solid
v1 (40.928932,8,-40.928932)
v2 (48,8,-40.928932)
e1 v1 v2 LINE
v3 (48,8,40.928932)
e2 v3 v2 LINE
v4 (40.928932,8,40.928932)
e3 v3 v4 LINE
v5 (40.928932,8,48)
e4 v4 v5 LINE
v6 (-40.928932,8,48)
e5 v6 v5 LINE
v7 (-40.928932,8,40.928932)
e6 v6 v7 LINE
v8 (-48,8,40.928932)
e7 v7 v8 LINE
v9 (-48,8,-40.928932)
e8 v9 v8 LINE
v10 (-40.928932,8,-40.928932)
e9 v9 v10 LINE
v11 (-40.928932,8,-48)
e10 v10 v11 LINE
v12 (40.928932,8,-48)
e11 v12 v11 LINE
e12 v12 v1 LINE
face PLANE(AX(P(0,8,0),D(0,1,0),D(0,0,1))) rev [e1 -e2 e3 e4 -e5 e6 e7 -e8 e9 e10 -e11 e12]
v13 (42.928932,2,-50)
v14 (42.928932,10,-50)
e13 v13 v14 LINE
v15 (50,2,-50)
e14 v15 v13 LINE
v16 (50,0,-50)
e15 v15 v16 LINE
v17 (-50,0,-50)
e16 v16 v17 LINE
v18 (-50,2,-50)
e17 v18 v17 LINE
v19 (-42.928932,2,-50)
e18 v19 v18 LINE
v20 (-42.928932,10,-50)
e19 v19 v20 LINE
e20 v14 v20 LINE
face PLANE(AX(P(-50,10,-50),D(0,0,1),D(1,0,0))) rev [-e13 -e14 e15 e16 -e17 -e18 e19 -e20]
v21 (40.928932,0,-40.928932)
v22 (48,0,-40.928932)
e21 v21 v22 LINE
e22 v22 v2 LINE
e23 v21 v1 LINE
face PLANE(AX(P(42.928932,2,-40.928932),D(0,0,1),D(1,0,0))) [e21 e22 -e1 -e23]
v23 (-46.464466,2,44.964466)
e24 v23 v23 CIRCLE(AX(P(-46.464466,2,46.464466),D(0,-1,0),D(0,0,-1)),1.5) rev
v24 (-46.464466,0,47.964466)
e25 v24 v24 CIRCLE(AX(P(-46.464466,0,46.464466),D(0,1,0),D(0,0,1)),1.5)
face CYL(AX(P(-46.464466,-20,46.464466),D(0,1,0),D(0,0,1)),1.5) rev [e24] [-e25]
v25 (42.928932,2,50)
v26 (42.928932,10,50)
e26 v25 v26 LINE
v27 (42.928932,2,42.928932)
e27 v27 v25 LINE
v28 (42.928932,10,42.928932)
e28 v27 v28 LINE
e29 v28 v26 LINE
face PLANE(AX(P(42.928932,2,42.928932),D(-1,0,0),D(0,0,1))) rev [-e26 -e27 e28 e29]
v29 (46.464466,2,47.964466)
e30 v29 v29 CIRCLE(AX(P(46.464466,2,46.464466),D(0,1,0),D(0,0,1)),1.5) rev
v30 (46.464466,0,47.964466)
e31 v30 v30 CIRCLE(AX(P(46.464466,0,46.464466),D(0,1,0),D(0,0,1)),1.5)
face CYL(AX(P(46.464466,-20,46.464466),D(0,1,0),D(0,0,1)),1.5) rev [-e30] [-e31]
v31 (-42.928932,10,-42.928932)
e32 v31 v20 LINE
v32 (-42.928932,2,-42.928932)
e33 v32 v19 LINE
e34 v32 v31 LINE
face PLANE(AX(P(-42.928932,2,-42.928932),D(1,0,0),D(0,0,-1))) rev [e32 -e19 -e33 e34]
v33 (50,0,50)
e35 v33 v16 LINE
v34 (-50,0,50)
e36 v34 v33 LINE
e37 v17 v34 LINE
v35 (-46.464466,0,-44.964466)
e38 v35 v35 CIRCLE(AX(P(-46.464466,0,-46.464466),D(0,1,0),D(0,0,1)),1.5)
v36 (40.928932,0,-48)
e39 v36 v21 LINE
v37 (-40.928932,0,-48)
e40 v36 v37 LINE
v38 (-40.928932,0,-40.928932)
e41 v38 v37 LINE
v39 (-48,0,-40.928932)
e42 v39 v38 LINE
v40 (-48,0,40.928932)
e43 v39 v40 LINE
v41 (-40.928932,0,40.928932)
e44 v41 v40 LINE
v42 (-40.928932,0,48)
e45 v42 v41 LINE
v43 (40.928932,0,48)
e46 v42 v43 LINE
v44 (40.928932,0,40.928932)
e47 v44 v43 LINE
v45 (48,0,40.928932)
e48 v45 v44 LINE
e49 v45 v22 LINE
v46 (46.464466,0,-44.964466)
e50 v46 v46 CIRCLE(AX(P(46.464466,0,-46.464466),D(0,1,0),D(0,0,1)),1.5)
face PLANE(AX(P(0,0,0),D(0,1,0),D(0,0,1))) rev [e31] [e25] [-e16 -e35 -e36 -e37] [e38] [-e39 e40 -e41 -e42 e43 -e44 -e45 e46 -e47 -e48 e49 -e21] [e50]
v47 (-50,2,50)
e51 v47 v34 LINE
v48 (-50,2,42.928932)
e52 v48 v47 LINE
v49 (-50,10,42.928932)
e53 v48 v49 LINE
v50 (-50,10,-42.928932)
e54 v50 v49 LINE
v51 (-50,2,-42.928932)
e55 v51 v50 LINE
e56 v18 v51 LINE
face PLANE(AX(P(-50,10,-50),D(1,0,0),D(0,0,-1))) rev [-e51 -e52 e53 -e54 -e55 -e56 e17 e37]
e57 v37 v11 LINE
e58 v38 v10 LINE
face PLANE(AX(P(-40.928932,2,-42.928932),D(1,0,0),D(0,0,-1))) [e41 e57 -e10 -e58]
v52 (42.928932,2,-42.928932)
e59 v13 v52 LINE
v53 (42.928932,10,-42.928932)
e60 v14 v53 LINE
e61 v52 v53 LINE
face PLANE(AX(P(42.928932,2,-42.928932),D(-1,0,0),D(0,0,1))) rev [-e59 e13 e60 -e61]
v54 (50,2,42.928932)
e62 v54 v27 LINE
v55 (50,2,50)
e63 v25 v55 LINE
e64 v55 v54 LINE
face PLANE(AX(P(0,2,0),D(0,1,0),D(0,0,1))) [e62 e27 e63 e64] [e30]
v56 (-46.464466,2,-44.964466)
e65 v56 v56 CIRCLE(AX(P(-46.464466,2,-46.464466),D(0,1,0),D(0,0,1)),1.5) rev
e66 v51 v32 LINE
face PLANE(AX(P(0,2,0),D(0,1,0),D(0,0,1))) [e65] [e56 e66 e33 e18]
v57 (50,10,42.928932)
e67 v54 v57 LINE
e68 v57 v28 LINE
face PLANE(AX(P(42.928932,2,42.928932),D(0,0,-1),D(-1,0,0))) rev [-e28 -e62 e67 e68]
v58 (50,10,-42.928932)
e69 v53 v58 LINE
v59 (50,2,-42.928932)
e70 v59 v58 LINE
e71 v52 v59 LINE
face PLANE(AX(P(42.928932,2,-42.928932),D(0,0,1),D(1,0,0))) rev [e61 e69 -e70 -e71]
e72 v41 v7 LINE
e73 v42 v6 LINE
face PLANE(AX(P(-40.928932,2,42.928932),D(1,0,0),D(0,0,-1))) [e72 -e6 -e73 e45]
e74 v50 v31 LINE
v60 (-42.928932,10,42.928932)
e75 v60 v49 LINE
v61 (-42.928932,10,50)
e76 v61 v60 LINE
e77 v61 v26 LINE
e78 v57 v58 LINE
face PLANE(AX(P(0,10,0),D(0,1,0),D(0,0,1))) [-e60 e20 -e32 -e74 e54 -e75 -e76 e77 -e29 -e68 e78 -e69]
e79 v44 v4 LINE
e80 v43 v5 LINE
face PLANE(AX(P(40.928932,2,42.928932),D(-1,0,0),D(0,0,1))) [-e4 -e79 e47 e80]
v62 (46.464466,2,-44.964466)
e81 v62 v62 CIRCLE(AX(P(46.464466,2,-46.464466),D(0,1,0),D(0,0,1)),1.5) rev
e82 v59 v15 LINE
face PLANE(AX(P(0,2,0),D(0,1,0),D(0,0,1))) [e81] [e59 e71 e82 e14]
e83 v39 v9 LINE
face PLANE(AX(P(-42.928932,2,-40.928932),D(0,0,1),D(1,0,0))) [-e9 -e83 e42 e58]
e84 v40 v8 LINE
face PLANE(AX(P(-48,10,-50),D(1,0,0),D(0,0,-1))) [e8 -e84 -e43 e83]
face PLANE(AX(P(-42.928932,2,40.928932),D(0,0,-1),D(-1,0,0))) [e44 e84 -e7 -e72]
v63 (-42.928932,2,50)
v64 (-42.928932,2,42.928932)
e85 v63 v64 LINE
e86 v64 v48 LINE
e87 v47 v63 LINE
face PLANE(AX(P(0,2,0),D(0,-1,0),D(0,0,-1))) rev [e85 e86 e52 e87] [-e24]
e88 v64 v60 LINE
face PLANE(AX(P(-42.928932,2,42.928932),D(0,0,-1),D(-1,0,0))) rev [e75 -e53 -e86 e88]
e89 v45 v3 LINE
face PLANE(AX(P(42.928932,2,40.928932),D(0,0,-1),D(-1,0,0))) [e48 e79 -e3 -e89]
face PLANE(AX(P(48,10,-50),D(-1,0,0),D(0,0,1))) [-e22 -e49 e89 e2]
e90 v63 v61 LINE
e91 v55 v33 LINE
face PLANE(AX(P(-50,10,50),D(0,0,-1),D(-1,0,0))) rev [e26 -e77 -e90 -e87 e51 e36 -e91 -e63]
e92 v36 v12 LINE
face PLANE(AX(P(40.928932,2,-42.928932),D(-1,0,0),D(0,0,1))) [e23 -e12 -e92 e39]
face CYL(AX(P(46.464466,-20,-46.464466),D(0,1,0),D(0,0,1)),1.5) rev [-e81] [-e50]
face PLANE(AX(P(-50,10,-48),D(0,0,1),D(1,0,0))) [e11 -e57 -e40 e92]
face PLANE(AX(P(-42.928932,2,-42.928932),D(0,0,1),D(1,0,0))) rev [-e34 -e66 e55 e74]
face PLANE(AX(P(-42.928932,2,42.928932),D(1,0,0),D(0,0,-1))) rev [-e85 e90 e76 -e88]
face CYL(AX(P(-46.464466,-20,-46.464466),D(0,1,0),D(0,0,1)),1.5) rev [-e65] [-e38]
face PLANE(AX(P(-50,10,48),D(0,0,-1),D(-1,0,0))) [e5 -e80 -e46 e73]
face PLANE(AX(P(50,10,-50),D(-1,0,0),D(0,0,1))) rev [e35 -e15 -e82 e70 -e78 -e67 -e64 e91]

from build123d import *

# Parameters (mm, degrees)
CROQUIS1_W              = 100
CROQUIS1_H              = 100
SALIENTE_EXTRUIR1_DEPTH = 10
CROQUIS2_R              = 1.5
CORTAR_EXTRUIR1_DEPTH   = 30
CROQUIS3_W              = 7.071067812
CROQUIS3_H              = 7.071067812
CORTAR_EXTRUIR2_DEPTH   = 8
VACIADO1_START          = -48
VACIADO1_OUTLINE_W      = 8
VACIADO1_OUTLINE_H      = 81.857864376
VACIADO1_DEPTH          = 96
VACIADO1_START_2        = -40.928932188
VACIADO1_2_OUTLINE_W    = 8
VACIADO1_2_OUTLINE_H    = 7.071067812
VACIADO1_2_DEPTH        = 81.857864376


# Read off the part's stored shape, not the designer's step: Vaciado1
with BuildPart() as part:
    # Croquis1 → Saliente-Extruir1 (new body)
    with BuildSketch(Plane(origin=(0, 0, 0), x_dir=(1, 0, 0), z_dir=(0, 1, 0))):
        Rectangle(CROQUIS1_W, CROQUIS1_H)
    extrude(amount=SALIENTE_EXTRUIR1_DEPTH)

    # Croquis2 → Cortar-Extruir1 (cut)
    with BuildSketch(Plane(origin=(0, 10, 0), x_dir=(1, 0, 0), z_dir=(0, 1, 0))):
        with Locations(Location((-46.464466094, -46.464466094, 0), (0, 0, 270))):
            Circle(CROQUIS2_R)
        with Locations(Location((-46.464466094, 46.464466094, 0), (0, 0, 270))):
            Circle(CROQUIS2_R)
        with Locations(Location((46.464466094, 46.464466094, 0), (0, 0, 270))):
            Circle(CROQUIS2_R)
        with Locations(Location((46.464466094, -46.464466094, 0), (0, 0, 270))):
            Circle(CROQUIS2_R)
    extrude(amount=-CORTAR_EXTRUIR1_DEPTH, mode=Mode.SUBTRACT)

    # Croquis3 → Cortar-Extruir2 (cut)
    with BuildSketch(Plane(origin=(0, 10, 0), x_dir=(1, 0, 0), z_dir=(0, 1, 0))):
        with Locations((-46.464466094, -46.464466094)):
            Rectangle(CROQUIS3_W, CROQUIS3_H)
        with Locations((-46.464466094, 46.464466094)):
            Rectangle(CROQUIS3_W, CROQUIS3_H)
        with Locations((46.464466094, 46.464466094)):
            Rectangle(CROQUIS3_W, CROQUIS3_H)
        with Locations((46.464466094, -46.464466094)):
            Rectangle(CROQUIS3_W, CROQUIS3_H)
    extrude(amount=-CORTAR_EXTRUIR2_DEPTH, mode=Mode.SUBTRACT)

    # Vaciado1 outline → Vaciado1 (cut)
    with BuildSketch(Plane.YZ.offset(VACIADO1_START)):
        with Locations((4, 0)):
            Rectangle(VACIADO1_OUTLINE_W, VACIADO1_OUTLINE_H)
    extrude(amount=VACIADO1_DEPTH, mode=Mode.SUBTRACT)

    # Vaciado1 2 outline → Vaciado1 2 (cut)
    with BuildSketch(Plane.YZ.offset(VACIADO1_START_2)):
        with Locations((4, -44.464466094)):
            Rectangle(VACIADO1_2_OUTLINE_W, VACIADO1_2_OUTLINE_H)
        with Locations((4, 44.464466094)):
            Rectangle(VACIADO1_2_OUTLINE_W, VACIADO1_2_OUTLINE_H)
    extrude(amount=VACIADO1_2_DEPTH, mode=Mode.SUBTRACT)


solid = part.part
